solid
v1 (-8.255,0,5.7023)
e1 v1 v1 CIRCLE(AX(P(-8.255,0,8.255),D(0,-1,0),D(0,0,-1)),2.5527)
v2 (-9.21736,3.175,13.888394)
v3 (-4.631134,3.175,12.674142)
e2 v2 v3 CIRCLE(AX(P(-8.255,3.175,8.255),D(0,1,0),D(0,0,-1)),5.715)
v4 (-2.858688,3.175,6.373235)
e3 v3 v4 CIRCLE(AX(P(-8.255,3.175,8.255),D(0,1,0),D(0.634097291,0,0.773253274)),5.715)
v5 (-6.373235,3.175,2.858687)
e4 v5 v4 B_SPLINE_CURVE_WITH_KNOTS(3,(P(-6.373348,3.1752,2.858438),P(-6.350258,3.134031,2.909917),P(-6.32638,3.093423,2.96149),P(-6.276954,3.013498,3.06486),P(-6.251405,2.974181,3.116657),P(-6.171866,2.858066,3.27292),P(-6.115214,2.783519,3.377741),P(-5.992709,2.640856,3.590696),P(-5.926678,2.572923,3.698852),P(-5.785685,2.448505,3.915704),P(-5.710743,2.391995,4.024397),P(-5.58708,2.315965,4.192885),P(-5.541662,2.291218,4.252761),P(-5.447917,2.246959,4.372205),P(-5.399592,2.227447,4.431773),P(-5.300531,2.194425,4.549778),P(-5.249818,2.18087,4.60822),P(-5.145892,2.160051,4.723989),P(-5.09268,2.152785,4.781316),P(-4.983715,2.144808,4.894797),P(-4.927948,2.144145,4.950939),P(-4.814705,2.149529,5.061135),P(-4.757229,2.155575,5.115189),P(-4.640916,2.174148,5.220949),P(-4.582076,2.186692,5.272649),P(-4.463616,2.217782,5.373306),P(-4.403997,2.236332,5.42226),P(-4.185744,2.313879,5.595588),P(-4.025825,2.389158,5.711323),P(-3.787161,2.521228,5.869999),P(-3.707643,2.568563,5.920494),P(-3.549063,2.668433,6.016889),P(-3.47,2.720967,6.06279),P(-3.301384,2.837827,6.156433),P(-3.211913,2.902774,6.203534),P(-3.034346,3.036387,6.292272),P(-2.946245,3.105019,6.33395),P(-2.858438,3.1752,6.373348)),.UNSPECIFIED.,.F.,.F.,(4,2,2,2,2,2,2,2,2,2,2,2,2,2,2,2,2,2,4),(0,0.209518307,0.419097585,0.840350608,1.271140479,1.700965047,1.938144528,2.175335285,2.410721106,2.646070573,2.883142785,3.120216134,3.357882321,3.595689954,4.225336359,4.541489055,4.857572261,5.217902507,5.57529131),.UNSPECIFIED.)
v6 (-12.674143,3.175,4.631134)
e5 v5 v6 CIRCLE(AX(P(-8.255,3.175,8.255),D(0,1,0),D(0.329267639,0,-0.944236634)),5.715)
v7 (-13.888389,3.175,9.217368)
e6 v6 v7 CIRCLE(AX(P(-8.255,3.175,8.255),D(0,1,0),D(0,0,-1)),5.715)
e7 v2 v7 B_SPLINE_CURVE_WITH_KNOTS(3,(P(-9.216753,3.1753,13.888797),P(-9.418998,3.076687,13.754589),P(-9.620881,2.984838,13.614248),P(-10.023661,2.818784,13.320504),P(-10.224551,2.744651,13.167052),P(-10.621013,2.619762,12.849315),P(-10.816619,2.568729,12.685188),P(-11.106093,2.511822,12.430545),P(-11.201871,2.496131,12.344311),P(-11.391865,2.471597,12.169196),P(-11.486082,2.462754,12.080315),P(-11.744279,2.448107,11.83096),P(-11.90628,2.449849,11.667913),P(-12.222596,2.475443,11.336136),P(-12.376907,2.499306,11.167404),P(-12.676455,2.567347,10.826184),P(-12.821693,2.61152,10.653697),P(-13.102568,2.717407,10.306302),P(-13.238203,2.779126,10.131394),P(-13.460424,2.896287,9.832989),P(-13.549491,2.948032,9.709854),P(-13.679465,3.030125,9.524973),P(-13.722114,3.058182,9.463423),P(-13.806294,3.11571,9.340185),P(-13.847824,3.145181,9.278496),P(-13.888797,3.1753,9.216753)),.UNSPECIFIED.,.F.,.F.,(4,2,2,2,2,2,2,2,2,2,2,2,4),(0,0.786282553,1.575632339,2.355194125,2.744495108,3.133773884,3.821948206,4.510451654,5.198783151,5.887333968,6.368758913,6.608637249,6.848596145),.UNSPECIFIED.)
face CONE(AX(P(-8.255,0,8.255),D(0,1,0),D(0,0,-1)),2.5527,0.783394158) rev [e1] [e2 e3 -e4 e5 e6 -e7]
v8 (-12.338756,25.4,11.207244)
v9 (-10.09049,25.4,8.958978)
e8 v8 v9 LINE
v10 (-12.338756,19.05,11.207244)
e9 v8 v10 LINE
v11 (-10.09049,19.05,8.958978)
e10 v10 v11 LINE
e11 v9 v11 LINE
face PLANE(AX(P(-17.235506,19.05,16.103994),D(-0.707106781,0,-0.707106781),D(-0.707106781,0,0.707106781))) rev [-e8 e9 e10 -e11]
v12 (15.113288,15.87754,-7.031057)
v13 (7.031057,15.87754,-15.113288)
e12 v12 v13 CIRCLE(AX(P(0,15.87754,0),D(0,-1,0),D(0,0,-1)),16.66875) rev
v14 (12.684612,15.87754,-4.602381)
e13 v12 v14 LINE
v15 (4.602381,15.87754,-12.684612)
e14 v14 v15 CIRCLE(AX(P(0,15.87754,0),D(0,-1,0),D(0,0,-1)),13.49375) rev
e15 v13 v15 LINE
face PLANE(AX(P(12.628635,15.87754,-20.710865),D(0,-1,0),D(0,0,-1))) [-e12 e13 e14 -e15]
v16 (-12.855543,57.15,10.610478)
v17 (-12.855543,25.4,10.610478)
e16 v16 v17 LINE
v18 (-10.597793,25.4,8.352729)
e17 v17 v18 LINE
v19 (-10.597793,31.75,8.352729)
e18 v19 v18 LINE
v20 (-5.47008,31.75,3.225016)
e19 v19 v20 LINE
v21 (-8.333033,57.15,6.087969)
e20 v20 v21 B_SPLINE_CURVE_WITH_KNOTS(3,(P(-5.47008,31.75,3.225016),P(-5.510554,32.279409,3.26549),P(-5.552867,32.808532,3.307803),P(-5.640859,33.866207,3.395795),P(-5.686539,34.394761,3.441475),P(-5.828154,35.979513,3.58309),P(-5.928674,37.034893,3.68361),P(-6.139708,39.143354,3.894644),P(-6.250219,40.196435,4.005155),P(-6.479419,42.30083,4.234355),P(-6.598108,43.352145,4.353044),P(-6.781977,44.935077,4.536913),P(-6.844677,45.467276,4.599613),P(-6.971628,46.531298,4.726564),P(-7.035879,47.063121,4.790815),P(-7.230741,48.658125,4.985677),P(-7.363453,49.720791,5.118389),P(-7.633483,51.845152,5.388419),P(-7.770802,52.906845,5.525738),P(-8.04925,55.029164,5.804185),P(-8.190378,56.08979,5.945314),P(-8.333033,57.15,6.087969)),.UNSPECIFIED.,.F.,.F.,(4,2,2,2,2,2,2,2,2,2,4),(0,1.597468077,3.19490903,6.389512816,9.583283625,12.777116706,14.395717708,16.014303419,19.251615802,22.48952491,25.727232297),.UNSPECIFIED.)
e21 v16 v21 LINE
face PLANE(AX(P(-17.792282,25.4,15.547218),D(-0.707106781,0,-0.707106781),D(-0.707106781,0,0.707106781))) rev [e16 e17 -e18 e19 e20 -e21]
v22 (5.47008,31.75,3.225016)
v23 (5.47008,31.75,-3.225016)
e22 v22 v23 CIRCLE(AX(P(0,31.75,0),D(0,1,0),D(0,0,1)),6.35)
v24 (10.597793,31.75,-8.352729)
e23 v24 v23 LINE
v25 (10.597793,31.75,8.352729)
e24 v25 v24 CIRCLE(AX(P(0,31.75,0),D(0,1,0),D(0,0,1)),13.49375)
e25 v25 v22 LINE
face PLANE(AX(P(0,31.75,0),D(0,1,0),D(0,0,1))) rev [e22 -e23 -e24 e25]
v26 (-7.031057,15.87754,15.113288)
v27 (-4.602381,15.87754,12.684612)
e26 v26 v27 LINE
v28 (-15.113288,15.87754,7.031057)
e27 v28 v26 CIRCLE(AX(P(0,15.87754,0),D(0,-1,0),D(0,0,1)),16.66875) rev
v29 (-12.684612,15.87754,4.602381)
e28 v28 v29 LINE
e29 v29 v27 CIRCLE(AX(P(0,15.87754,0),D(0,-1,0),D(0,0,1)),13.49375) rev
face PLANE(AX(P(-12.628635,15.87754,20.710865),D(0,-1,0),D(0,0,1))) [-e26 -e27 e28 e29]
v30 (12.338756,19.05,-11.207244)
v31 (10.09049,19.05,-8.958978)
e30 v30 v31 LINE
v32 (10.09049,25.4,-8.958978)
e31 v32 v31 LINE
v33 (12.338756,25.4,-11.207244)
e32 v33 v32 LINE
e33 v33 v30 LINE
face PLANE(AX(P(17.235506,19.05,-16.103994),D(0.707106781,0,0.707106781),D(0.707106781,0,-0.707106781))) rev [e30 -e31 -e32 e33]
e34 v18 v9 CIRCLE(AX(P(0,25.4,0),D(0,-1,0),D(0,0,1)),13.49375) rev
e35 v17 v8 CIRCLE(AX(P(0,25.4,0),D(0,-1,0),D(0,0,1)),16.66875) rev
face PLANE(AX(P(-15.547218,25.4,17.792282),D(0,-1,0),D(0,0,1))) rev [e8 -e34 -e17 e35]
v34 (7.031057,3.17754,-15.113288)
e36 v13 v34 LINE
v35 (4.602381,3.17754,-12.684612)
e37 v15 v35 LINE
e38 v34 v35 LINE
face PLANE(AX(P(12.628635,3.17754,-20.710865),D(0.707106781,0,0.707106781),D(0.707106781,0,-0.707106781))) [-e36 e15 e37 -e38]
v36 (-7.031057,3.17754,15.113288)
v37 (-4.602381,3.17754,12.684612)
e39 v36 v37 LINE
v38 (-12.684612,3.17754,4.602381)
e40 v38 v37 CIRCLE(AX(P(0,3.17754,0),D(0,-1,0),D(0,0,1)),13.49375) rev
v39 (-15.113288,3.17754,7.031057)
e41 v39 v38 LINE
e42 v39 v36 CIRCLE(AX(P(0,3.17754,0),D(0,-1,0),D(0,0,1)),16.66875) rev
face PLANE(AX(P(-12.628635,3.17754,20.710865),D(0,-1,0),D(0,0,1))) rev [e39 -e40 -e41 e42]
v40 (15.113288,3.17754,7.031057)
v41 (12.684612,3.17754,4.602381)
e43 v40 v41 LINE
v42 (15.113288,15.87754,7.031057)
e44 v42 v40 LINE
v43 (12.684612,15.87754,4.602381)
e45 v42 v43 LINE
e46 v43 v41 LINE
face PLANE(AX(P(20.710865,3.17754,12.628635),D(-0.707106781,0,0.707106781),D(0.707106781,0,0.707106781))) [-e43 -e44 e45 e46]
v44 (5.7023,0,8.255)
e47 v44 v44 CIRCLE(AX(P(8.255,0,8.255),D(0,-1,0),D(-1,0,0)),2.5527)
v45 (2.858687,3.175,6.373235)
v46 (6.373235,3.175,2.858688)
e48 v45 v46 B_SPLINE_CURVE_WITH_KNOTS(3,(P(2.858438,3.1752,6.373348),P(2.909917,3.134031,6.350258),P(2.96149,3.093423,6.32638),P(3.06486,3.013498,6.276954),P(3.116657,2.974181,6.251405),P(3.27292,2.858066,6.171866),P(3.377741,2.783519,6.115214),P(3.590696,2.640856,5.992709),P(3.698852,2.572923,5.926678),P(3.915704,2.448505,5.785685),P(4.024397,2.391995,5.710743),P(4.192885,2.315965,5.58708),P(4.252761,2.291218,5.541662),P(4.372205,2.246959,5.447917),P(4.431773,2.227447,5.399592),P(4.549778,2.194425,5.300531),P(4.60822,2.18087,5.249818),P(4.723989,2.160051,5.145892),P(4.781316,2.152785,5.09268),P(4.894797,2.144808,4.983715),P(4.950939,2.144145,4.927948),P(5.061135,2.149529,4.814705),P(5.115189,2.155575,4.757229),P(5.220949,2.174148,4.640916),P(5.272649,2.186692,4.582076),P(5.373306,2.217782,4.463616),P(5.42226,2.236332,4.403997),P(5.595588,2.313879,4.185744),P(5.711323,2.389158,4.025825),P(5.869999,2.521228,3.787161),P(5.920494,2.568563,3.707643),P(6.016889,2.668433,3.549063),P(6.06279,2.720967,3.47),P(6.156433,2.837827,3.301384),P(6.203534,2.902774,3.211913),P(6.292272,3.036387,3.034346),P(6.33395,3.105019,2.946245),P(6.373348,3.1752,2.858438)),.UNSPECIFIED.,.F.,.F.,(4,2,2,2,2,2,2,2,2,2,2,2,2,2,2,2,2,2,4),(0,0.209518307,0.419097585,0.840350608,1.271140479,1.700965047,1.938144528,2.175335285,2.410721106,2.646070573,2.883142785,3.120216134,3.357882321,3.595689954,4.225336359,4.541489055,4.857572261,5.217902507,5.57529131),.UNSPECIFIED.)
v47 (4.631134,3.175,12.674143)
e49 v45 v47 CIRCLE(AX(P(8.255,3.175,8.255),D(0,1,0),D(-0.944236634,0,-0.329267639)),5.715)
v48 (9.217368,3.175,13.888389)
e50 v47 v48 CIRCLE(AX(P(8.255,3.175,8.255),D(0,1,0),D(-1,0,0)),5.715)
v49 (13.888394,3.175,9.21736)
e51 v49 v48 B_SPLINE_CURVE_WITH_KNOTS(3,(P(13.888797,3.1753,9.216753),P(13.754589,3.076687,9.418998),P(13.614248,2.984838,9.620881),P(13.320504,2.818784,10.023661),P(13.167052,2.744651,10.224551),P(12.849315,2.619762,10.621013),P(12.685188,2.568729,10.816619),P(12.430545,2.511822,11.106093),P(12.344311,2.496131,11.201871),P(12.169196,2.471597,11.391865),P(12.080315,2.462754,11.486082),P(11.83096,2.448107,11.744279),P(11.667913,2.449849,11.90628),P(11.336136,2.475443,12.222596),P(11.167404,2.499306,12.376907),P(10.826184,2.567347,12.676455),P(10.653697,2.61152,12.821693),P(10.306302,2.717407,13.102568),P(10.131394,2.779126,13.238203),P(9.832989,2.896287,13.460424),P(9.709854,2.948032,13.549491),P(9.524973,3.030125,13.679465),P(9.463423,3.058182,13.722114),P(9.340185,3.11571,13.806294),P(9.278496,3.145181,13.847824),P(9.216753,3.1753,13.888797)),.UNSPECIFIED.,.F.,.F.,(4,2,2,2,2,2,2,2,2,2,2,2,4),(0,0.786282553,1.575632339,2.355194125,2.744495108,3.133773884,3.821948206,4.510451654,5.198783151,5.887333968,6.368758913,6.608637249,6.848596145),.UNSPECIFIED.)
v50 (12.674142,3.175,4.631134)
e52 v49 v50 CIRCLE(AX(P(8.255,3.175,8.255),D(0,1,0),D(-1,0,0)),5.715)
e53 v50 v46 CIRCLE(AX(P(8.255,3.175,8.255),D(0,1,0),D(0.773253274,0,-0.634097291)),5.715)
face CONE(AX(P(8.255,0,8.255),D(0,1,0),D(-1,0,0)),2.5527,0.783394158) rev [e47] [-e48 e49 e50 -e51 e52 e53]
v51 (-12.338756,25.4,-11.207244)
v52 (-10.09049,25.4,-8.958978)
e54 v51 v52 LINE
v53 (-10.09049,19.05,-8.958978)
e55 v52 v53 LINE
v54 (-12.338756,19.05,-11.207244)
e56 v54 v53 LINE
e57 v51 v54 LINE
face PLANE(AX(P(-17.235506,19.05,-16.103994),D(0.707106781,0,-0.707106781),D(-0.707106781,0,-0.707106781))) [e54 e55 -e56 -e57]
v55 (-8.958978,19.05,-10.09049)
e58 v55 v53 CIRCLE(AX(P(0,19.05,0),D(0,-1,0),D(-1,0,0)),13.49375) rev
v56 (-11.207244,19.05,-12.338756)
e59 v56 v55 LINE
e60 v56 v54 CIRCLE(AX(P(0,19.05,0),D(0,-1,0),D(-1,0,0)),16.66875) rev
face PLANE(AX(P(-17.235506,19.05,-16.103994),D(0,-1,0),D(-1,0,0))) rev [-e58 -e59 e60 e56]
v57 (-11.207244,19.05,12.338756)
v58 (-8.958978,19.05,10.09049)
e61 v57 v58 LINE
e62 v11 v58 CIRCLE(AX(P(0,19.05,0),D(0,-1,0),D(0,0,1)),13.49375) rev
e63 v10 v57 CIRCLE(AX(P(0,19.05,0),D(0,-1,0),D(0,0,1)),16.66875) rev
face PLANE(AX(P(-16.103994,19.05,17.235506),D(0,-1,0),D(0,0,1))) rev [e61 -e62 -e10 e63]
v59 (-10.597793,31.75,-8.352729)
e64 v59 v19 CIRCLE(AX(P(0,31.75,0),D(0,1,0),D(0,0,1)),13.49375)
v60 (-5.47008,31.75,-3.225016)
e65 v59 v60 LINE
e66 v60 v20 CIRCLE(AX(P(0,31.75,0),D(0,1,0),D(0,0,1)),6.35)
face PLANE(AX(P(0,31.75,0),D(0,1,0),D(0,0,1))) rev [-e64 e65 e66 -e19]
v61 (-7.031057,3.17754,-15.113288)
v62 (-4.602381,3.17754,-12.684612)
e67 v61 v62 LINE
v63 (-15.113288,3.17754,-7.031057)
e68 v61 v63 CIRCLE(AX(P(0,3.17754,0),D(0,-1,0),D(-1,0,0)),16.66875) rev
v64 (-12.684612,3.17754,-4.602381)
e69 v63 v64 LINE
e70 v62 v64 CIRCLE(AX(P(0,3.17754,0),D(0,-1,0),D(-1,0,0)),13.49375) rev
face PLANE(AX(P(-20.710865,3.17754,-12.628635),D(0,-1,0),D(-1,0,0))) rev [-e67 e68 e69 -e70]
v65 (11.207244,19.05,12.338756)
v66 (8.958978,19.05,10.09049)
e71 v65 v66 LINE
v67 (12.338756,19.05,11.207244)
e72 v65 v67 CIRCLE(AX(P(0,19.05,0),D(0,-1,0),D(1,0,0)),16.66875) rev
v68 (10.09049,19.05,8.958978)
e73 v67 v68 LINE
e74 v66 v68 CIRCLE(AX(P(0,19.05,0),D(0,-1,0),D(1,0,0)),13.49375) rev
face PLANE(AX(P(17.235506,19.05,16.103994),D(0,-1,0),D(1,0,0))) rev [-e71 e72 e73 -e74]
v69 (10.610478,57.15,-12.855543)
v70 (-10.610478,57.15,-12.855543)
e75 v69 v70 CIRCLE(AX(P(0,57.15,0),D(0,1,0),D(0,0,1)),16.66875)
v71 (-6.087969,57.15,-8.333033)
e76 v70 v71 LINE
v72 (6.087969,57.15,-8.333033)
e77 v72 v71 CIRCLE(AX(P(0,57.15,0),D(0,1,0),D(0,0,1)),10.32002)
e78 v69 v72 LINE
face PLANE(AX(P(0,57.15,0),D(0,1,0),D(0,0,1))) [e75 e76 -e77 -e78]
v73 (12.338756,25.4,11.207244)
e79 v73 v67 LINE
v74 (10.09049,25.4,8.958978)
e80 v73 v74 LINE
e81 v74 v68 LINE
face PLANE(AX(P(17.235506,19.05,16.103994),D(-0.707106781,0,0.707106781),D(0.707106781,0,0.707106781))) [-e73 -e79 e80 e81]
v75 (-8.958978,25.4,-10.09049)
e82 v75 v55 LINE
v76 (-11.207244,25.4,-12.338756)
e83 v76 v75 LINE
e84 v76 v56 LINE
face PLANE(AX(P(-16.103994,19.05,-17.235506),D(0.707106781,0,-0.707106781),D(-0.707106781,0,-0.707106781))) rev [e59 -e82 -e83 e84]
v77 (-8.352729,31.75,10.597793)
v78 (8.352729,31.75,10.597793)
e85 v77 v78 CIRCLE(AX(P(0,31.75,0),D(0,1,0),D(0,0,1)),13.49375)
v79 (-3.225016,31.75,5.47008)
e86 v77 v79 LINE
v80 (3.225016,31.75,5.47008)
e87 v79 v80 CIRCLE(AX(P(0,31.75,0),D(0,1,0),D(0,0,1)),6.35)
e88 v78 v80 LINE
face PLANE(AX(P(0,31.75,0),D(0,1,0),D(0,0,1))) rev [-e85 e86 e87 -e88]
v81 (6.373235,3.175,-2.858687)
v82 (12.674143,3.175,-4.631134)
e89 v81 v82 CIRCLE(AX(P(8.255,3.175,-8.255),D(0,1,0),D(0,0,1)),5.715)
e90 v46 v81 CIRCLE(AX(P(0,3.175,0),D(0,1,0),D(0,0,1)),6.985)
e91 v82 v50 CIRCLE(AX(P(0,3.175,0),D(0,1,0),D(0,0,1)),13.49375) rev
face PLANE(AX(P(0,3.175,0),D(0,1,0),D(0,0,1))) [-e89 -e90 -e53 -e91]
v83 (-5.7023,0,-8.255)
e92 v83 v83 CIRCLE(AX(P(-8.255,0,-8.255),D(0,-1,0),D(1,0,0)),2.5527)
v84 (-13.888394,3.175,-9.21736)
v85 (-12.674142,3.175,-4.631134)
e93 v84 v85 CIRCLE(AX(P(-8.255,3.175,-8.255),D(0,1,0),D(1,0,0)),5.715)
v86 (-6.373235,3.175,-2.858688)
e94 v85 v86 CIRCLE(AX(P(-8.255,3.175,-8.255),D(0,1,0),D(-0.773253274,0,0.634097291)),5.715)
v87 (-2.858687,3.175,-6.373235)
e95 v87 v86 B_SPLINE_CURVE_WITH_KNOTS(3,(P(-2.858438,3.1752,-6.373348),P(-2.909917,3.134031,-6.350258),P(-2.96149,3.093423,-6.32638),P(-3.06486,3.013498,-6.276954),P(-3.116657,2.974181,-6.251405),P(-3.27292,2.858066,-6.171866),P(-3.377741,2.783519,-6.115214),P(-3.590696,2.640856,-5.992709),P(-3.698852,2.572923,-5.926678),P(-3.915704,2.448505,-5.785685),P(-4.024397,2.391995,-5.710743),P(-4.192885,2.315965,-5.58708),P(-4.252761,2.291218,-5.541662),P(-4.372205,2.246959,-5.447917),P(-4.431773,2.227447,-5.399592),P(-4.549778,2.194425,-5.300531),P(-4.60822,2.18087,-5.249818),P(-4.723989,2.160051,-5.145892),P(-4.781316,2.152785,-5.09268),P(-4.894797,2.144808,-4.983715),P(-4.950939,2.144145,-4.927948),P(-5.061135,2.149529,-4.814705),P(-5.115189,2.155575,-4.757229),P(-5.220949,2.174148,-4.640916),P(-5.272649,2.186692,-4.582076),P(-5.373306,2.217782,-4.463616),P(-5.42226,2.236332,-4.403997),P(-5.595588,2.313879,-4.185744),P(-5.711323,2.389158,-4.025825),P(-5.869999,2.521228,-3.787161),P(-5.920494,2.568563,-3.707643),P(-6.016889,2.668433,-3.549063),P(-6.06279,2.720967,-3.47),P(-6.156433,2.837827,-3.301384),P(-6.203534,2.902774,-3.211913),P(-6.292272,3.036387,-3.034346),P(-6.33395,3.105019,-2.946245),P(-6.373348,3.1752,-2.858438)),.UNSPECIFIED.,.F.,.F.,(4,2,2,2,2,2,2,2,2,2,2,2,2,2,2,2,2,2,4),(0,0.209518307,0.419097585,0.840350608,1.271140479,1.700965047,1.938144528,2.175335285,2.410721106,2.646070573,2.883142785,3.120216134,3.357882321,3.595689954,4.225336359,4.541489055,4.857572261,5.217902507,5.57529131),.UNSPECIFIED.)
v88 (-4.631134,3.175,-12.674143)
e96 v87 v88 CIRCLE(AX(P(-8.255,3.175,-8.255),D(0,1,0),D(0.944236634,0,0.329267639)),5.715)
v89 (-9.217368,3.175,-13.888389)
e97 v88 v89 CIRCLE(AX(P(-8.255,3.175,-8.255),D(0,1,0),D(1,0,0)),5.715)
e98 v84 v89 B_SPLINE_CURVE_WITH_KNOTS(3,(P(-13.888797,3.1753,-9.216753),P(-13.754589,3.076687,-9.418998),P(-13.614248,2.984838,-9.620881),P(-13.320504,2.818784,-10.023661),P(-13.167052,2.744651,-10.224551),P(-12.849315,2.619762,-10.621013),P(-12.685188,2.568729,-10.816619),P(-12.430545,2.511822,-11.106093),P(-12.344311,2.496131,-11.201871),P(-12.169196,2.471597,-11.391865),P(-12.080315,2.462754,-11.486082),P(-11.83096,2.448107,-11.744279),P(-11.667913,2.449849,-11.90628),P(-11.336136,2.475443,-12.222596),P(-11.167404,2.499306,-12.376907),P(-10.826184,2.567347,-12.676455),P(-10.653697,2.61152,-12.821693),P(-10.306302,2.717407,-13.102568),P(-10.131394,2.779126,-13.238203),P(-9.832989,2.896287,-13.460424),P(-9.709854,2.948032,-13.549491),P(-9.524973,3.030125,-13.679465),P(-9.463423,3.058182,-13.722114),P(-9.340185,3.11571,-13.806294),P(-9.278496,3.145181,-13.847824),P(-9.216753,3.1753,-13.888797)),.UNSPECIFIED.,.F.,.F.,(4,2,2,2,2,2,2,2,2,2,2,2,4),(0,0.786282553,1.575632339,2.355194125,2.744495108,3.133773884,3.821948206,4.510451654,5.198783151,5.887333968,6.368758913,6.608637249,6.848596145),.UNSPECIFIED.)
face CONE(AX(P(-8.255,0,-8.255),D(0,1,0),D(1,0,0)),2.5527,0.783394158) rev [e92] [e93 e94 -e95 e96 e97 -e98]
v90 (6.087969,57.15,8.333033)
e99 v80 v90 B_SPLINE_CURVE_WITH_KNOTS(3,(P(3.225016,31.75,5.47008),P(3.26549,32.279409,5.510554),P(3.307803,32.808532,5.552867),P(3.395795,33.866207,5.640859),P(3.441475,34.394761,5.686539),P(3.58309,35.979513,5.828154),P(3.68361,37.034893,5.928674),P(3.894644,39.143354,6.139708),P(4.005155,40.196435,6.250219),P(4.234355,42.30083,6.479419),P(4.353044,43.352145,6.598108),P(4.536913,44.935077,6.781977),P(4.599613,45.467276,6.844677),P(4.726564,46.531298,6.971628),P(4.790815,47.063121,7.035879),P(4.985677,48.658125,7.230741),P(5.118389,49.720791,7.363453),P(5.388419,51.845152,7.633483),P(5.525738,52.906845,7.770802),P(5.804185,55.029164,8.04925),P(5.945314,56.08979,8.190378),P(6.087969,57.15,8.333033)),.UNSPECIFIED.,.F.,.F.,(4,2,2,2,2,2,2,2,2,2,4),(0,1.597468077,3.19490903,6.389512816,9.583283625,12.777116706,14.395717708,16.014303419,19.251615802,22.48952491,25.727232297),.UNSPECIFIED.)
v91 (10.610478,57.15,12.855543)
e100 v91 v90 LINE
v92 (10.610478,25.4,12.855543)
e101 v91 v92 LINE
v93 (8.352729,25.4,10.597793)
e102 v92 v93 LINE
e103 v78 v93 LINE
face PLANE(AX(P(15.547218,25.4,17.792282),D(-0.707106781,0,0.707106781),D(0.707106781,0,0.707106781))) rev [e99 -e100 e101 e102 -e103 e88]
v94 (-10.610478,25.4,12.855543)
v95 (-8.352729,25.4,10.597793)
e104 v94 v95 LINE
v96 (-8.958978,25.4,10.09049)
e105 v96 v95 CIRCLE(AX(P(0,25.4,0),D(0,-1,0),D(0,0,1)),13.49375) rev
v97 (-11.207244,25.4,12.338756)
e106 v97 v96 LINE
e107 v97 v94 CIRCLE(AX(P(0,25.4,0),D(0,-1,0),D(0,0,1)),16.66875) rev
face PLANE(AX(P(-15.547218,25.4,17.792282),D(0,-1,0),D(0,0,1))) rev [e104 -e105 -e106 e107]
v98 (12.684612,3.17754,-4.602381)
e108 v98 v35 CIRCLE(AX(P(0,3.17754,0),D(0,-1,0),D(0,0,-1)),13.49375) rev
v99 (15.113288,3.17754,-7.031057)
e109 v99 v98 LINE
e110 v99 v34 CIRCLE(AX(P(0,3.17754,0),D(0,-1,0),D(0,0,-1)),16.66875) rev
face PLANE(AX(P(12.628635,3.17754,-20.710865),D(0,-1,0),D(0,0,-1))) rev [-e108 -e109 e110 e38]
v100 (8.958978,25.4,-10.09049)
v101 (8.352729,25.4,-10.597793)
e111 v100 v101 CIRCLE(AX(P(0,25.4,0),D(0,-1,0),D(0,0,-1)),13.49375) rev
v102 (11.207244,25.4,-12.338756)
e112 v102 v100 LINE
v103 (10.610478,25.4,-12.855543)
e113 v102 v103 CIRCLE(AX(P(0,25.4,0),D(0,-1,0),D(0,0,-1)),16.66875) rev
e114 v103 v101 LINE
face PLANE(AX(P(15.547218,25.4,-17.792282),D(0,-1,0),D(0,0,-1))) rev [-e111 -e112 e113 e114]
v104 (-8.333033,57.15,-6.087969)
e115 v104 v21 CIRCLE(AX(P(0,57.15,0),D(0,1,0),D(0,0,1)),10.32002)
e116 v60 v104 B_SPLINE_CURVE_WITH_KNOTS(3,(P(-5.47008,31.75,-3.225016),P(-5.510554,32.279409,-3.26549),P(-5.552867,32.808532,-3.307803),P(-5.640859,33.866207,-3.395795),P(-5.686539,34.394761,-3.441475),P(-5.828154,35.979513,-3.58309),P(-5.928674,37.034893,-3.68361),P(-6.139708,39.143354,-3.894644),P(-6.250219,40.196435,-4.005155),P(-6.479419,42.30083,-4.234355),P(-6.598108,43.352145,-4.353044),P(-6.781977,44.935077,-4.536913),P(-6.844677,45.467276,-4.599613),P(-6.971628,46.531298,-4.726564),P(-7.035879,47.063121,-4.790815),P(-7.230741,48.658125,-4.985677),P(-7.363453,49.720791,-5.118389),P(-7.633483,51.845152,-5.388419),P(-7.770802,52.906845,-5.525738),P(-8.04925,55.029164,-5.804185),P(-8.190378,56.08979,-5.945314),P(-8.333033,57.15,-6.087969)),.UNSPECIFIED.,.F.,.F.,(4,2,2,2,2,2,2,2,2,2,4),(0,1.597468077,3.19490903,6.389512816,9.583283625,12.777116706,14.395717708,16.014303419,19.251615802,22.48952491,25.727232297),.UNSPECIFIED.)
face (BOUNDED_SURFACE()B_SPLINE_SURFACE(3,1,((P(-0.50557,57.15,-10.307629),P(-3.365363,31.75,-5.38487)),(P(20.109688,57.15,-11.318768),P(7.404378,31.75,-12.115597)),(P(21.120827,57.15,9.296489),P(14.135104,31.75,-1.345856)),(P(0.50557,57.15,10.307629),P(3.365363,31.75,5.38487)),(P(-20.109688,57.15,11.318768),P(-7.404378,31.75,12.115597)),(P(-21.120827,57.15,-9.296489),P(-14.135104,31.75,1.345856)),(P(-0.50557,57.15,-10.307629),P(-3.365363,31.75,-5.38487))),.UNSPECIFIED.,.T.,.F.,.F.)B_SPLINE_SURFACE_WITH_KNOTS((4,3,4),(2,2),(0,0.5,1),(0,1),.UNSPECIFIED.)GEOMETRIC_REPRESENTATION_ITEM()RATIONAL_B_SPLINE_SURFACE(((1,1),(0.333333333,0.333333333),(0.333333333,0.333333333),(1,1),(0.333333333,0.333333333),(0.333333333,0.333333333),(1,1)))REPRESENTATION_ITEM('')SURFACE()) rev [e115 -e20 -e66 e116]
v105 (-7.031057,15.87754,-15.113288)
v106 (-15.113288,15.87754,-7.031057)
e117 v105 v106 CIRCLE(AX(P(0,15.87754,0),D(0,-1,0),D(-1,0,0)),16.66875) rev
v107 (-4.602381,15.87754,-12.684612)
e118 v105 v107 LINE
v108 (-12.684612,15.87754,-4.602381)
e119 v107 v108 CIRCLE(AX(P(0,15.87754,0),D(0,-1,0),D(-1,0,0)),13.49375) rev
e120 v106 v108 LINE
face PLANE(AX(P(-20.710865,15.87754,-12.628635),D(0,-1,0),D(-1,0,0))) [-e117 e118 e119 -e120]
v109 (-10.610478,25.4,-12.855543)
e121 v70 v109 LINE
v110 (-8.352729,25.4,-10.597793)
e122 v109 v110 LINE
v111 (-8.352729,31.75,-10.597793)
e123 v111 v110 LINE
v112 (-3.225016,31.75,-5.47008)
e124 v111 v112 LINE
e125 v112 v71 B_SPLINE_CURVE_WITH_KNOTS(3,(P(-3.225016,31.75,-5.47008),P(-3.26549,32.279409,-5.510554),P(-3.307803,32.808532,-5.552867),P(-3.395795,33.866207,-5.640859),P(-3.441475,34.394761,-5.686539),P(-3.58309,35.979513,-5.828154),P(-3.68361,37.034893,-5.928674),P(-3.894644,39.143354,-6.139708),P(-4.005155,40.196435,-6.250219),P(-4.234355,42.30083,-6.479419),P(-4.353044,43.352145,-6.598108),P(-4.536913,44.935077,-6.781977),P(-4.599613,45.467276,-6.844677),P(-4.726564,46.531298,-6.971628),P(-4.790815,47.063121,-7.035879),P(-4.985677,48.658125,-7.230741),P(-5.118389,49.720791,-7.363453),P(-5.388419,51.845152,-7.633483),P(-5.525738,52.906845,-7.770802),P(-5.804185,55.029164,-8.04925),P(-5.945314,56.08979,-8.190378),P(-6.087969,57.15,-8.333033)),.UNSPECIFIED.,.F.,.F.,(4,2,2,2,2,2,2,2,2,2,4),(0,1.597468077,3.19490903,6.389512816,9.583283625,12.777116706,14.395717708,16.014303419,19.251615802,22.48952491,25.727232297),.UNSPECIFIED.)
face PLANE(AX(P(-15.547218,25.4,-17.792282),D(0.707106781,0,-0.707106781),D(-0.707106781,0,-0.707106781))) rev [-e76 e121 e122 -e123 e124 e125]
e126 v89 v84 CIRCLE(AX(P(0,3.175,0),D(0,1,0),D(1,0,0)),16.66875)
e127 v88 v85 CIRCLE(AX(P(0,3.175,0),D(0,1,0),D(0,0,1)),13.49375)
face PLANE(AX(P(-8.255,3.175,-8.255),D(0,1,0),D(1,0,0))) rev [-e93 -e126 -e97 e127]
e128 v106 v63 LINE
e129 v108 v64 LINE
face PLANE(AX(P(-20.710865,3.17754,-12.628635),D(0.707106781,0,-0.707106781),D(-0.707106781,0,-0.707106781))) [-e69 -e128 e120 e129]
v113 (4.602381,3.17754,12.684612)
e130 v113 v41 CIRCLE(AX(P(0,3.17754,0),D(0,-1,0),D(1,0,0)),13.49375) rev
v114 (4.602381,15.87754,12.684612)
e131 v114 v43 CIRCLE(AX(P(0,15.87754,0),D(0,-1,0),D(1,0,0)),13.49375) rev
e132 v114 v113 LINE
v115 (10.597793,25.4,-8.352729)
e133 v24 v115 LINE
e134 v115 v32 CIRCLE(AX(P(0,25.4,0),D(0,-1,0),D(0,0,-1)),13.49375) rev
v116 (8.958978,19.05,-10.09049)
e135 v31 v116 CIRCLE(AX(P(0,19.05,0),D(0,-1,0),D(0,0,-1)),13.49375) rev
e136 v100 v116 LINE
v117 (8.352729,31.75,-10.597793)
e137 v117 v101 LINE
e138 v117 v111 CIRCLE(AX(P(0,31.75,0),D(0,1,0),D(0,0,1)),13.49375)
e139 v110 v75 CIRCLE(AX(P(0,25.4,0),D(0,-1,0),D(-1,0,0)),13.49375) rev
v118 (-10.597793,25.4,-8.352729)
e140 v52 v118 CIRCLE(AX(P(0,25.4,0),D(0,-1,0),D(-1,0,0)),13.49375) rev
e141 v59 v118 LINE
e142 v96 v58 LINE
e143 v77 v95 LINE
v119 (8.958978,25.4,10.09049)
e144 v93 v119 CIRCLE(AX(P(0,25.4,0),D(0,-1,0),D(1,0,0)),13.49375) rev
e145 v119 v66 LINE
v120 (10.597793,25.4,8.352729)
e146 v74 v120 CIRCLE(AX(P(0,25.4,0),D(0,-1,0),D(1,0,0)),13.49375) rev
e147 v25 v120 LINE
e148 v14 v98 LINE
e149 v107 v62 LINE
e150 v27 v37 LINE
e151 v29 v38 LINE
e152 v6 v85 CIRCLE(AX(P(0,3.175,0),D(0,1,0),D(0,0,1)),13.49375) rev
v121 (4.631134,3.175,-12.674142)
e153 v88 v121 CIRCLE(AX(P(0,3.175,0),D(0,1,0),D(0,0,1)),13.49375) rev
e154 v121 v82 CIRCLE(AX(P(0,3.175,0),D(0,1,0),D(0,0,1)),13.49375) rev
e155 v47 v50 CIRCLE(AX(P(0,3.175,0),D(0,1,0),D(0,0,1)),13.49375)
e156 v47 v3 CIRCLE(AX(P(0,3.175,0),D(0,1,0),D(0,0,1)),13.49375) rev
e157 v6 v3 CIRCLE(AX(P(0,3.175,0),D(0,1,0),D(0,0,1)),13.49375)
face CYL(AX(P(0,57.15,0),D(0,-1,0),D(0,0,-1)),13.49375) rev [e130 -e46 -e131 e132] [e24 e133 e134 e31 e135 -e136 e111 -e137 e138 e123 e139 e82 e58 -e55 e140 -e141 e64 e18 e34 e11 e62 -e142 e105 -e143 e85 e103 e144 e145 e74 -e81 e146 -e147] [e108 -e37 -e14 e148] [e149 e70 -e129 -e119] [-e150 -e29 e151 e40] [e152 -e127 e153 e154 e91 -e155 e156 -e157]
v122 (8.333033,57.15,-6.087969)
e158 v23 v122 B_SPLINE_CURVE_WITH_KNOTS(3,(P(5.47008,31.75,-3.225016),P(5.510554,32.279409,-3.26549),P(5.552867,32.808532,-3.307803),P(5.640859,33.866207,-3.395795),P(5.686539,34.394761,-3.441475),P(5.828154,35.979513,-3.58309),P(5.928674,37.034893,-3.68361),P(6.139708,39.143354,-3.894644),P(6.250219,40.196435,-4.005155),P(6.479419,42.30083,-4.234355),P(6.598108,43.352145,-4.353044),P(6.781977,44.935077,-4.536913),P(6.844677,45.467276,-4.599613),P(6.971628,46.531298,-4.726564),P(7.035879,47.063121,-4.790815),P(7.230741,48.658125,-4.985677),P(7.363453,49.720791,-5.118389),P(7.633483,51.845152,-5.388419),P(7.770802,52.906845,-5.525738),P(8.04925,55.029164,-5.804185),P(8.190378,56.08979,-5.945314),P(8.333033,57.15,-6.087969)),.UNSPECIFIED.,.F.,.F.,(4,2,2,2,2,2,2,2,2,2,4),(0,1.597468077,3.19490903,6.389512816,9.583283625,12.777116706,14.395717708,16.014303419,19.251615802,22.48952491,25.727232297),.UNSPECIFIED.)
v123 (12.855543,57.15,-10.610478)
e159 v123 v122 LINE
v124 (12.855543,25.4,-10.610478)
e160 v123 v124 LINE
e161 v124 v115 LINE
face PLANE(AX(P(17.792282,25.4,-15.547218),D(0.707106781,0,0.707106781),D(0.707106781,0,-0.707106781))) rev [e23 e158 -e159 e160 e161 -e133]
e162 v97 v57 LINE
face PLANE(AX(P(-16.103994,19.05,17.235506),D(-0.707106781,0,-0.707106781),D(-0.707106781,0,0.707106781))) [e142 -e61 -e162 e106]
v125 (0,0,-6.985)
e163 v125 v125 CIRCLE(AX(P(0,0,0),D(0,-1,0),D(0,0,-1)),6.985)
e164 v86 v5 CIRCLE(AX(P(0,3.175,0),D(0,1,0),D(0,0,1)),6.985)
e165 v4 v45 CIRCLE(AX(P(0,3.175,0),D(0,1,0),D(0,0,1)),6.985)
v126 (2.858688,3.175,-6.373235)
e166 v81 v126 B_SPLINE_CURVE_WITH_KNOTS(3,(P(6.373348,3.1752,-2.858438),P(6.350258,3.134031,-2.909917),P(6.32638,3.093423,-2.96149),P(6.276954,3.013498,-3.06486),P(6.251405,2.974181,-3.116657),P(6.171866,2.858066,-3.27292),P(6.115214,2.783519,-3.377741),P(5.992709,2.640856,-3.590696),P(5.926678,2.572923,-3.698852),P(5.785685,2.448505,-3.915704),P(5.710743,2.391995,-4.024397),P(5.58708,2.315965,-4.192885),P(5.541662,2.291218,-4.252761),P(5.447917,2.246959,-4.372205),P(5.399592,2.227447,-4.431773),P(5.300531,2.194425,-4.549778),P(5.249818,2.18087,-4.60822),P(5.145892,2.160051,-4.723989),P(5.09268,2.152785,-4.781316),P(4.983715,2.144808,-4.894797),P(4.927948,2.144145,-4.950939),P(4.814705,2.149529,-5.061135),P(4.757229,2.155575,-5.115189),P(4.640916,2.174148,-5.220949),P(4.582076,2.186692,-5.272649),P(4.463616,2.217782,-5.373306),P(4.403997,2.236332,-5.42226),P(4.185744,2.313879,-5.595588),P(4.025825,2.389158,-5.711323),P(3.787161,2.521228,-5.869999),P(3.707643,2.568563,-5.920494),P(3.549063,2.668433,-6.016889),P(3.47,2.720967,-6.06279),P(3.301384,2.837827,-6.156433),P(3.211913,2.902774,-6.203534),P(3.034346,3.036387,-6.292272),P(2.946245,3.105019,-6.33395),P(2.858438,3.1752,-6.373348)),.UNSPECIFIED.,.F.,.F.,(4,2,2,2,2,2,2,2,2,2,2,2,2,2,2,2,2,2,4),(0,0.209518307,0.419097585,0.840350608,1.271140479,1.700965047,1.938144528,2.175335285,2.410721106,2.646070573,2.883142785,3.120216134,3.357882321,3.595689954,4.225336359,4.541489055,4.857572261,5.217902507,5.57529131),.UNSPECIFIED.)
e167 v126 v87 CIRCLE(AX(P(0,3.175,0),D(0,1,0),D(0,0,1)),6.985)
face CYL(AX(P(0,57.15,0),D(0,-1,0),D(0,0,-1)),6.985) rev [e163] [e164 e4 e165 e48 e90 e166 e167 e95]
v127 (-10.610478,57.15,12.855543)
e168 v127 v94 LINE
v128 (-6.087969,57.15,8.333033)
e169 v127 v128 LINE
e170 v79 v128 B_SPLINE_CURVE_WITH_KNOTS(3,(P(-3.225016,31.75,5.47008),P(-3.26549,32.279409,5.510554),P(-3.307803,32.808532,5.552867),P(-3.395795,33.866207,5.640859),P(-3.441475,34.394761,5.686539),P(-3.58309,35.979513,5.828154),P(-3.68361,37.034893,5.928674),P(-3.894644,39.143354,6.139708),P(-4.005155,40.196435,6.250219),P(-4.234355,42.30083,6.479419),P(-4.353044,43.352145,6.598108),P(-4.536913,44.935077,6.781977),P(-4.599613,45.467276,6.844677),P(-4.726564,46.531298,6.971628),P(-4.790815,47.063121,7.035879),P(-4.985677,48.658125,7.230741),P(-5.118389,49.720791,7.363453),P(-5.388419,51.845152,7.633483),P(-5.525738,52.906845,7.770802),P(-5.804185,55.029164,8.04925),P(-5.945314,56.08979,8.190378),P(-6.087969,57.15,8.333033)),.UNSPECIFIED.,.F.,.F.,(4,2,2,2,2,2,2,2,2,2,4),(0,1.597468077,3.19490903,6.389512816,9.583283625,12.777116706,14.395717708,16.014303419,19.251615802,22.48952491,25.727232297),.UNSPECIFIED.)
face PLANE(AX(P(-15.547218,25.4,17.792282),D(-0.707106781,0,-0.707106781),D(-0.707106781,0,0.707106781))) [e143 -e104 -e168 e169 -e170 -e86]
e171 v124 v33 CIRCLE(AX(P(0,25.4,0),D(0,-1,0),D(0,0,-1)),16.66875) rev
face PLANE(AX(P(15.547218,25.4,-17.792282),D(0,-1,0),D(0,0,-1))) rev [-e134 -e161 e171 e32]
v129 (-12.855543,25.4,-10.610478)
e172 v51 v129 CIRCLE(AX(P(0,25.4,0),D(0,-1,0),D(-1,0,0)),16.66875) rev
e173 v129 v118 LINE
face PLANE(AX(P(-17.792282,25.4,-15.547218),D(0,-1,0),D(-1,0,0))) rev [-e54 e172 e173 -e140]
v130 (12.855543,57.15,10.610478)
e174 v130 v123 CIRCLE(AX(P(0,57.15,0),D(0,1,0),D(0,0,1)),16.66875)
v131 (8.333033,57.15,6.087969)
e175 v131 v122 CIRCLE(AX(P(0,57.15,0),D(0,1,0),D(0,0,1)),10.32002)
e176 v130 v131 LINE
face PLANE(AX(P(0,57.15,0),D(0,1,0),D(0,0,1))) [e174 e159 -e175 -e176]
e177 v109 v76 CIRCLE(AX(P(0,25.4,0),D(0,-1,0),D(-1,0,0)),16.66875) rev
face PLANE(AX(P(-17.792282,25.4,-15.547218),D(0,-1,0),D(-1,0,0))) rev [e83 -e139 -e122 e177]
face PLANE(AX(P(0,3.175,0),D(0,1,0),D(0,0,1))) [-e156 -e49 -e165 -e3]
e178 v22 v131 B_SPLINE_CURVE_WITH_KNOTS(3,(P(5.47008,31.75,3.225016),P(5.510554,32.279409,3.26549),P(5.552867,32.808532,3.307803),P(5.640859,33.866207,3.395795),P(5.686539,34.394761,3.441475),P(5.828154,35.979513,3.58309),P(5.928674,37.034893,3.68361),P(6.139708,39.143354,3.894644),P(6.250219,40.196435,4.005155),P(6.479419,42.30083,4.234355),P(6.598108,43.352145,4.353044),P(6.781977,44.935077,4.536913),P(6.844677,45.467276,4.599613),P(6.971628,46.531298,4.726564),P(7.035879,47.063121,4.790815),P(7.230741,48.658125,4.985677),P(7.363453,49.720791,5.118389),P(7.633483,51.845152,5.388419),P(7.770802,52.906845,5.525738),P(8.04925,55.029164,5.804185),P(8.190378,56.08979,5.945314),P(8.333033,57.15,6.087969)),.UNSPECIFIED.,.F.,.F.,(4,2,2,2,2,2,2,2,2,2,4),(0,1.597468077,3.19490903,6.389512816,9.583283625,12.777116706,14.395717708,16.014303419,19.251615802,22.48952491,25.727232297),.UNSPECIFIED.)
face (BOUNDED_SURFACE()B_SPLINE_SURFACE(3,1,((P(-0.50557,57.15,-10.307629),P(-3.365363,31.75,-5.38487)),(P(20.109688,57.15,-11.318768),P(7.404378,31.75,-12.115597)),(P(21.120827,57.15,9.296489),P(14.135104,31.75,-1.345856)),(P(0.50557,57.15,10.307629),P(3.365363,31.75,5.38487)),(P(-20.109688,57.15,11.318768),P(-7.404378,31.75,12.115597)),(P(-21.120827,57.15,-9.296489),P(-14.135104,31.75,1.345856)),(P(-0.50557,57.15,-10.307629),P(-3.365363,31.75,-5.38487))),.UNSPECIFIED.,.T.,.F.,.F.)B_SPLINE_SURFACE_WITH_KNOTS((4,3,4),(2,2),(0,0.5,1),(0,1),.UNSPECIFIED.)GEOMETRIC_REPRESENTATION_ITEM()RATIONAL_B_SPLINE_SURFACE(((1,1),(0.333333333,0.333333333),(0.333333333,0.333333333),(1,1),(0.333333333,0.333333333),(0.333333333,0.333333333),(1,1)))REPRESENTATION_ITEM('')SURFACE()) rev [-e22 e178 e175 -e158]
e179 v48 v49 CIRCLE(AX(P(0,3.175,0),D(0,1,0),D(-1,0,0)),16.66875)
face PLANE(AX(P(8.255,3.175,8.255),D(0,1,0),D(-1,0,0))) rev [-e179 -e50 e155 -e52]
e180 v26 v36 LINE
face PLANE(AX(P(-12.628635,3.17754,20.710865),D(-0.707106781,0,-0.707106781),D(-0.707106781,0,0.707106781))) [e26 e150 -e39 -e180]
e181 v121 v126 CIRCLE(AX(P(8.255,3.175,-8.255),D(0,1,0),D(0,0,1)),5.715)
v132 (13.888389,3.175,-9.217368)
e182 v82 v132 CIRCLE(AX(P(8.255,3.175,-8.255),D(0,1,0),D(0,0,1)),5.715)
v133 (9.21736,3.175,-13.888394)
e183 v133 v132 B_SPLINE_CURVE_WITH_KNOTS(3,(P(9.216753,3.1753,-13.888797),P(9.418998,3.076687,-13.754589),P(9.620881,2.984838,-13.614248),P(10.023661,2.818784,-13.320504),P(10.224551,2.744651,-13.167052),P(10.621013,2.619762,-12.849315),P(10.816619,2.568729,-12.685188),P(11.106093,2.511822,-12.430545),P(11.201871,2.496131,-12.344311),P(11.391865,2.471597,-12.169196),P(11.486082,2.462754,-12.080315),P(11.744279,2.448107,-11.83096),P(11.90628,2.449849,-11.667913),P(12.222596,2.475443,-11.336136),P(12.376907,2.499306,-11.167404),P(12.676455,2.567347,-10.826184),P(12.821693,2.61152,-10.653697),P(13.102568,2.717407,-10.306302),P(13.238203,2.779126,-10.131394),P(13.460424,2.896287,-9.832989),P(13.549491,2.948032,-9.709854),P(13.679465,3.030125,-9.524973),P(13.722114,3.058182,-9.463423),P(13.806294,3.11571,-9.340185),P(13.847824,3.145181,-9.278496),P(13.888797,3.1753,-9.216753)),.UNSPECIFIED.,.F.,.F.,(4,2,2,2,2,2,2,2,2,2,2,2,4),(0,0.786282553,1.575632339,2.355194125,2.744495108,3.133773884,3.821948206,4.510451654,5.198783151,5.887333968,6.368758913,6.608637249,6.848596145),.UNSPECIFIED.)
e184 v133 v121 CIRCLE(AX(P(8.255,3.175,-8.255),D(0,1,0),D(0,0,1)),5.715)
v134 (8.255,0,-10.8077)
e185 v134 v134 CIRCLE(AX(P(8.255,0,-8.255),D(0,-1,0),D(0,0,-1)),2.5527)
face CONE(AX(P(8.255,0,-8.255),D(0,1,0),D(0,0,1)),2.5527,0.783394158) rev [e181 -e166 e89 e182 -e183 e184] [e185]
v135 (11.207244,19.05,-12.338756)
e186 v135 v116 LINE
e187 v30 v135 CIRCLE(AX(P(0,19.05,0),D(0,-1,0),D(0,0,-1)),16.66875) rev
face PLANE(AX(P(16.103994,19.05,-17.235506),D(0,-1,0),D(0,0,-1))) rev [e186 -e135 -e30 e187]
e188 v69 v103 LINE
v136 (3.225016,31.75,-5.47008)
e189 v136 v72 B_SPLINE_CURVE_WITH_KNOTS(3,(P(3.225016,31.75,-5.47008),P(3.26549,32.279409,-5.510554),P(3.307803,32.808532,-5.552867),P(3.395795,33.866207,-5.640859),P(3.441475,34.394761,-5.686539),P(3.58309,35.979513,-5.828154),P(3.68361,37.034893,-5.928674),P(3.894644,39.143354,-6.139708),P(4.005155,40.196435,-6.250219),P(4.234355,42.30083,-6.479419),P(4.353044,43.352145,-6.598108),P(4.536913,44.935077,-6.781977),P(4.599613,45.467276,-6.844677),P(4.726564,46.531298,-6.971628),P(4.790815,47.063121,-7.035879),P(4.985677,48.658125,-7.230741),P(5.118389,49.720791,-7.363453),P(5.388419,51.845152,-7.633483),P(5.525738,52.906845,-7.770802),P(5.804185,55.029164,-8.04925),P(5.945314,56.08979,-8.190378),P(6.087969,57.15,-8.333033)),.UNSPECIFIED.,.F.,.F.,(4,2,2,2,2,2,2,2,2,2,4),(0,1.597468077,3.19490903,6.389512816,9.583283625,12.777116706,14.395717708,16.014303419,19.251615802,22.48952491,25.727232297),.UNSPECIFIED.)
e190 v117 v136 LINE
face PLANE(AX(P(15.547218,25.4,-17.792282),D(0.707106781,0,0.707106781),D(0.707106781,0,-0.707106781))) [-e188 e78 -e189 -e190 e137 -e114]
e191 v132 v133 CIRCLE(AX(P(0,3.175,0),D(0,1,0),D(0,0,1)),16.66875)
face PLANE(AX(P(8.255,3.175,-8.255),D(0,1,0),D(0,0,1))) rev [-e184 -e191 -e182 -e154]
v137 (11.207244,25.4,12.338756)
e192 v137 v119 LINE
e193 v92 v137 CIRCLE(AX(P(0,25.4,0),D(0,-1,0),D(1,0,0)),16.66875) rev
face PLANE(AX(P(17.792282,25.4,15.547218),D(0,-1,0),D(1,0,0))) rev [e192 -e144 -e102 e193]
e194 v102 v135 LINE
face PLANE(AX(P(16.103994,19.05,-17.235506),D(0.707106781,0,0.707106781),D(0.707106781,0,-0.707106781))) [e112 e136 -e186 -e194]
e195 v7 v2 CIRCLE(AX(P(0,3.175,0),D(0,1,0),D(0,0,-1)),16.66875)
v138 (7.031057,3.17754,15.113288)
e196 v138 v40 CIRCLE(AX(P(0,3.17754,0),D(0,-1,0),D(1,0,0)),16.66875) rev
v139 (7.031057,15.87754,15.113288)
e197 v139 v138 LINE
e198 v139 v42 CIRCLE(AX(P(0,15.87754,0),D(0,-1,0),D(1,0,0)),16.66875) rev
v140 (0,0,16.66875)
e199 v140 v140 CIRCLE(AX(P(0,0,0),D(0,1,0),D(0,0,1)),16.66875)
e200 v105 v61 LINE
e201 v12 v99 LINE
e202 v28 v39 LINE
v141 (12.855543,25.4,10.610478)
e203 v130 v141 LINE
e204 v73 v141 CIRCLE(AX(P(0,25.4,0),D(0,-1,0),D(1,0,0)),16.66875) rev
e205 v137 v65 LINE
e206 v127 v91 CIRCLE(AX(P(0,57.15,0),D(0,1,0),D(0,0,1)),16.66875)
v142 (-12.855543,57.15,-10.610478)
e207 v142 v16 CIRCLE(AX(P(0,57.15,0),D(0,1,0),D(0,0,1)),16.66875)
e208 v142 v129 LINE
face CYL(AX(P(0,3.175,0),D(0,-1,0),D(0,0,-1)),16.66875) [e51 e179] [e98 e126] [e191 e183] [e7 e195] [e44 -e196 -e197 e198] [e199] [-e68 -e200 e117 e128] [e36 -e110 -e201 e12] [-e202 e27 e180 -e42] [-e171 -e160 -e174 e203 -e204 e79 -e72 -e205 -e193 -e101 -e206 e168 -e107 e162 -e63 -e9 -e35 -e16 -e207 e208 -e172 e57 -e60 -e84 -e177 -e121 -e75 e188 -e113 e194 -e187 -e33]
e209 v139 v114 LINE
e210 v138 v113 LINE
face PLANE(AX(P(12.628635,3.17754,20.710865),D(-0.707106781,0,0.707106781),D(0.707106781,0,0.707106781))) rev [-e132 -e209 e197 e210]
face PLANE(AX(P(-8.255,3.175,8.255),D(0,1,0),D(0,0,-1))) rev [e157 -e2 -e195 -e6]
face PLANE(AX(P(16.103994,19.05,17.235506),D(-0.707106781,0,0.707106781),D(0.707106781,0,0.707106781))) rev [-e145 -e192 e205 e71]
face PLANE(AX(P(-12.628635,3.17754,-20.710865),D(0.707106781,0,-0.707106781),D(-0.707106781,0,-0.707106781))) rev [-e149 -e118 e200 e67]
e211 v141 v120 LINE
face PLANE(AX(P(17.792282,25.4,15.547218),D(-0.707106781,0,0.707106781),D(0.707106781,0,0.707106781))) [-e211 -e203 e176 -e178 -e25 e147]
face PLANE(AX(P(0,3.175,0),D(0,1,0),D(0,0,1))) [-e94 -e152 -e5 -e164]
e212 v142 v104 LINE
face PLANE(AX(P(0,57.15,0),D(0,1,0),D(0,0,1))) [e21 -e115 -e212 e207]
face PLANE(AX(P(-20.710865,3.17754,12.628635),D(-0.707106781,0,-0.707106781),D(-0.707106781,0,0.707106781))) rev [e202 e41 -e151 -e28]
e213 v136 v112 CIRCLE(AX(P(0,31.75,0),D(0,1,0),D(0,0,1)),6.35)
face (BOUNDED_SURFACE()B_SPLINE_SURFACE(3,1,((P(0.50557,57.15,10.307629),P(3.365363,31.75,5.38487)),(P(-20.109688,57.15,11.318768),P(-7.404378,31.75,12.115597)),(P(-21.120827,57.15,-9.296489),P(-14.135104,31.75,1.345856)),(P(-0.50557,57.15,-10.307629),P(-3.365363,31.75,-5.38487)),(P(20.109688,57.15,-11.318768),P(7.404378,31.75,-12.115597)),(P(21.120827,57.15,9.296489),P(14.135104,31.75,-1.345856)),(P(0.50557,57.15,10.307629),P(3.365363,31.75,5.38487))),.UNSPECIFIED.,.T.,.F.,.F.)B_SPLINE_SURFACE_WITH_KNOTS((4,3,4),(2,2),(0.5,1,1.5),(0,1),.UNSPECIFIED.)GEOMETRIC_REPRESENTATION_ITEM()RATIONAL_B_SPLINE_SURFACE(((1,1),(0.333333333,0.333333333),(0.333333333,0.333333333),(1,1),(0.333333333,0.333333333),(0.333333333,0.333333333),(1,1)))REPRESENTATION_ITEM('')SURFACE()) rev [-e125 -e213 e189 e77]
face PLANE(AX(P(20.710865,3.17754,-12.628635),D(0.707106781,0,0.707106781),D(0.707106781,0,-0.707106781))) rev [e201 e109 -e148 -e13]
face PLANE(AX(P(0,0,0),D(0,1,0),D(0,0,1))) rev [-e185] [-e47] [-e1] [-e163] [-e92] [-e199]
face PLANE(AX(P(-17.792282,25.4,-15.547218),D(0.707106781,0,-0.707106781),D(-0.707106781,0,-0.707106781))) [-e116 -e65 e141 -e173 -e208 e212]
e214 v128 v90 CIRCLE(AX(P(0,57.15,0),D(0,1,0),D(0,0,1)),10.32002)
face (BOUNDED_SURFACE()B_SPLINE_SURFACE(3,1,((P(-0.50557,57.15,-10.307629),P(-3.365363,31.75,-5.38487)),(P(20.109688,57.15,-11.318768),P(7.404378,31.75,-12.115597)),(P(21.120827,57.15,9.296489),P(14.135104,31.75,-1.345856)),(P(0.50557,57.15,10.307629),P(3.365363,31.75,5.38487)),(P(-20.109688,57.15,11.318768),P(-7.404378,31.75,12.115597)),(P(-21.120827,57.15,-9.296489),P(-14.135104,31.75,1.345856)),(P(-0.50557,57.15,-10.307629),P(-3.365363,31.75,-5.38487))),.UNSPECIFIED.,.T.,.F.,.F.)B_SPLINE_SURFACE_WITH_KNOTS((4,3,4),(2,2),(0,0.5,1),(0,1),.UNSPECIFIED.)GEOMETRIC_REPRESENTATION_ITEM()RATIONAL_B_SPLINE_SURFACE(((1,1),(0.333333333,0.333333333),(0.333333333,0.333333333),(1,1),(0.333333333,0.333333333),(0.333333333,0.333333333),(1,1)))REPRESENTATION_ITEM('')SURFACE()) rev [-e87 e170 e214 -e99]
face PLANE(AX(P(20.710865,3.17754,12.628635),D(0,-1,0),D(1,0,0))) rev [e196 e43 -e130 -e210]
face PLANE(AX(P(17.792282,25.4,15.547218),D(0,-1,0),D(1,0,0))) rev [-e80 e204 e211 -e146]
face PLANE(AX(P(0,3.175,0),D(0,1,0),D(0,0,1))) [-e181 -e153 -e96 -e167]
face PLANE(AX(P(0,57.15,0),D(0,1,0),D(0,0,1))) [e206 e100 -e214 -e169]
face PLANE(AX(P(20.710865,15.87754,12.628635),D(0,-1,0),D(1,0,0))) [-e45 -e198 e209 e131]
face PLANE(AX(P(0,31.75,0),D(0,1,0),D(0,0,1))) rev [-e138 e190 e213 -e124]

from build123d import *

# Parameters (mm, degrees)
SKETCH1_R           = 16.66875
BOSS_EXTRUDE1_DEPTH = 3.175
SKETCH2_R           = 16.66875
SKETCH2_R_2         = 13.49375
BOSS_EXTRUDE2_DEPTH = 53.975
SKETCH7_R           = 6.985
CUT_EXTRUDE1_DEPTH  = 62.82084562
SKETCH12_R          = 14.2875
BOSS_EXTRUDE7_DEPTH = 25.4
CUT_EXTRUDE2_REACH  = 63.821
SKETCH9_W           = 12.7
SKETCH9_H           = 11.43
SKETCH9_W_2         = 6.35
SKETCH9_H_2         = 1.6002
SKETCH9_W_3         = 152.4
SKETCH9_H_3         = 3.175
CIRPATTERN2_COUNT   = 4
SKETCH5_R           = 2.5527
SKETCH6_R           = 5.715
CIRPATTERN1_COUNT   = 4


with BuildPart() as part:
    # Sketch1 → Boss-Extrude1 (new body)
    with BuildSketch(Plane(origin=(0, 0, 0), x_dir=(1, 0, 0), z_dir=(0, 1, 0))):
        with Locations(Location((0, 0, 0), (0, 0, 270))):
            Circle(SKETCH1_R)
    extrude(amount=BOSS_EXTRUDE1_DEPTH)

    # Sketch2 → Boss-Extrude2 (add)
    with BuildSketch(Plane(origin=(0, 3.175, 0), x_dir=(1, 0, 0), z_dir=(0, 1, 0))):
        with Locations(Location((0, 0, 0), (0, 0, 270))):
            Circle(SKETCH2_R)
        with Locations(Location((0, 0, 0), (0, 0, 270))):
            Circle(SKETCH2_R_2, mode=Mode.SUBTRACT)
    extrude(amount=BOSS_EXTRUDE2_DEPTH)

    # Sketch7 → Cut-Extrude1 (cut, through all)
    with BuildSketch(Plane.XZ):
        with Locations(Location((0, 0, 0), (0, 0, 270))):
            Circle(SKETCH7_R)
    extrude(amount=-CUT_EXTRUDE1_DEPTH, mode=Mode.SUBTRACT)

    # Sketch12 → Boss-Extrude7 (add)
    with BuildSketch(Plane(origin=(0, 31.75, 0), x_dir=(1, 0, 0), z_dir=(0, 1, 0))):
        Circle(SKETCH12_R)
    extrude(amount=BOSS_EXTRUDE7_DEPTH)

    # Cut-Loft2: read off the stored shape, not the designer's step
    # Cut-Loft2: loft between two sections, ruled curve by curve
    cut_loft2_from = [
        Edge.make_bspline([(-0.505569823, 57.15, -10.307628823), (20.109687823, 57.15, -11.318768468), (21.120827469, 57.15, 9.296489178), (0.505569823, 57.15, 10.307628823), (-20.109687823, 57.15, 11.318768468), (-21.120827469, 57.15, -9.296489178), (-0.505569823, 57.15, -10.307628823)], [0, 0, 0, 0, 0.5, 0.5, 0.5, 1, 1, 1, 1], 3, [1, 0.333333333, 0.333333333, 1, 0.333333333, 0.333333333, 1]),
    ]
    cut_loft2_to = [
        Edge.make_bspline([(-3.365363271, 31.75, -5.384870477), (7.404377683, 31.75, -12.115597019), (14.135104225, 31.75, -1.345856065), (3.365363271, 31.75, 5.384870477), (-7.404377683, 31.75, 12.115597019), (-14.135104225, 31.75, 1.345856065), (-3.365363271, 31.75, -5.384870477)], [0, 0, 0, 0, 0.5, 0.5, 0.5, 1, 1, 1, 1], 3, [1, 0.333333333, 0.333333333, 1, 0.333333333, 0.333333333, 1]),
    ]
    cut_loft2 = Solid(Shell([*[Face.make_surface_from_curves(cut_loft2_from[k], cut_loft2_to[k]) for k in range(1)], Face(Wire(cut_loft2_from)), Face(Wire(cut_loft2_to))]))
    add(cut_loft2, mode=Mode.SUBTRACT)

    # Sketch9 → Cut-Extrude2 (cut, up to next)
    with BuildSketch(Plane(origin=(0, 0, 0), x_dir=(0, -1, 0), z_dir=(-0.7071067811865488, 0, 0.7071067811865464)), mode=Mode.PRIVATE) as cut_extrude2_sk1:
        with Locations((-9.52754, 0)):
            Rectangle(SKETCH9_W, SKETCH9_H)
    cut_extrude2_tool1 = extrude(cut_extrude2_sk1.sketch, amount=-CUT_EXTRUDE2_REACH, mode=Mode.PRIVATE) & part.part
    # Sketch9 → Cut-Extrude2 (cut, up to next)
    with BuildSketch(Plane(origin=(0, 0, 0), x_dir=(0, -1, 0), z_dir=(-0.7071067811865488, 0, 0.7071067811865464)), mode=Mode.PRIVATE) as cut_extrude2_sk2:
        with Locations((-22.225, 0)):
            Rectangle(SKETCH9_W_2, SKETCH9_H_2)
    cut_extrude2_tool2 = extrude(cut_extrude2_sk2.sketch, amount=-CUT_EXTRUDE2_REACH, mode=Mode.PRIVATE) & part.part
    # Sketch9 → Cut-Extrude2 (cut, up to next)
    with BuildSketch(Plane(origin=(0, 0, 0), x_dir=(0, -1, 0), z_dir=(-0.7071067811865488, 0, 0.7071067811865464)), mode=Mode.PRIVATE) as cut_extrude2_sk3:
        with Locations((-101.6, 0)):
            Rectangle(SKETCH9_W_3, SKETCH9_H_3)
    cut_extrude2_tool3 = extrude(cut_extrude2_sk3.sketch, amount=-CUT_EXTRUDE2_REACH, mode=Mode.PRIVATE) & part.part
    cut_extrude2_1 = cut_extrude2_tool1.solids().sort_by_distance((0, 9.52754, 0))[0]
    add(cut_extrude2_1, mode=Mode.SUBTRACT)
    cut_extrude2_2 = cut_extrude2_tool2.solids().sort_by_distance((0, 22.225, 0))[0]
    add(cut_extrude2_2, mode=Mode.SUBTRACT)
    cut_extrude2_3 = cut_extrude2_tool3.solids().sort_by_distance((0, 101.6, 0))[0]
    add(cut_extrude2_3, mode=Mode.SUBTRACT)
    cut_extrude2 = cut_extrude2_1 + cut_extrude2_2 + cut_extrude2_3  # Cut-Extrude2 as one shape, for the pattern or mirror that repeats it

    # CirPattern2: Cut-Extrude2 ×4 about axis
    cirpattern2_axis = Axis((0, 0, 0), (0, 1, 0))
    for i in range(1, CIRPATTERN2_COUNT):
        add(cut_extrude2.rotate(cirpattern2_axis, i * 360 / CIRPATTERN2_COUNT), mode=Mode.SUBTRACT)

    # Sketch5 → Cut-Loft1 section 0
    with BuildSketch(Plane.XZ):
        with Locations((8.255, -8.255)):
            Circle(SKETCH5_R)
    # Sketch6 → Cut-Loft1 section 1
    with BuildSketch(Plane(origin=(0, 3.175, 0), x_dir=(1, 0, 0), z_dir=(0, 1, 0))):
        with Locations((8.255, 8.255)):
            Circle(SKETCH6_R)
    cut_loft1 = loft(mode=Mode.SUBTRACT)

    # CirPattern1: Cut-Loft1 ×4 about axis
    cirpattern1_axis = Axis((0, 0, 0), (0, 1, 0))
    for i in range(1, CIRPATTERN1_COUNT):
        add(cut_loft1.rotate(cirpattern1_axis, i * 360 / CIRPATTERN1_COUNT), mode=Mode.SUBTRACT)


solid = part.part
